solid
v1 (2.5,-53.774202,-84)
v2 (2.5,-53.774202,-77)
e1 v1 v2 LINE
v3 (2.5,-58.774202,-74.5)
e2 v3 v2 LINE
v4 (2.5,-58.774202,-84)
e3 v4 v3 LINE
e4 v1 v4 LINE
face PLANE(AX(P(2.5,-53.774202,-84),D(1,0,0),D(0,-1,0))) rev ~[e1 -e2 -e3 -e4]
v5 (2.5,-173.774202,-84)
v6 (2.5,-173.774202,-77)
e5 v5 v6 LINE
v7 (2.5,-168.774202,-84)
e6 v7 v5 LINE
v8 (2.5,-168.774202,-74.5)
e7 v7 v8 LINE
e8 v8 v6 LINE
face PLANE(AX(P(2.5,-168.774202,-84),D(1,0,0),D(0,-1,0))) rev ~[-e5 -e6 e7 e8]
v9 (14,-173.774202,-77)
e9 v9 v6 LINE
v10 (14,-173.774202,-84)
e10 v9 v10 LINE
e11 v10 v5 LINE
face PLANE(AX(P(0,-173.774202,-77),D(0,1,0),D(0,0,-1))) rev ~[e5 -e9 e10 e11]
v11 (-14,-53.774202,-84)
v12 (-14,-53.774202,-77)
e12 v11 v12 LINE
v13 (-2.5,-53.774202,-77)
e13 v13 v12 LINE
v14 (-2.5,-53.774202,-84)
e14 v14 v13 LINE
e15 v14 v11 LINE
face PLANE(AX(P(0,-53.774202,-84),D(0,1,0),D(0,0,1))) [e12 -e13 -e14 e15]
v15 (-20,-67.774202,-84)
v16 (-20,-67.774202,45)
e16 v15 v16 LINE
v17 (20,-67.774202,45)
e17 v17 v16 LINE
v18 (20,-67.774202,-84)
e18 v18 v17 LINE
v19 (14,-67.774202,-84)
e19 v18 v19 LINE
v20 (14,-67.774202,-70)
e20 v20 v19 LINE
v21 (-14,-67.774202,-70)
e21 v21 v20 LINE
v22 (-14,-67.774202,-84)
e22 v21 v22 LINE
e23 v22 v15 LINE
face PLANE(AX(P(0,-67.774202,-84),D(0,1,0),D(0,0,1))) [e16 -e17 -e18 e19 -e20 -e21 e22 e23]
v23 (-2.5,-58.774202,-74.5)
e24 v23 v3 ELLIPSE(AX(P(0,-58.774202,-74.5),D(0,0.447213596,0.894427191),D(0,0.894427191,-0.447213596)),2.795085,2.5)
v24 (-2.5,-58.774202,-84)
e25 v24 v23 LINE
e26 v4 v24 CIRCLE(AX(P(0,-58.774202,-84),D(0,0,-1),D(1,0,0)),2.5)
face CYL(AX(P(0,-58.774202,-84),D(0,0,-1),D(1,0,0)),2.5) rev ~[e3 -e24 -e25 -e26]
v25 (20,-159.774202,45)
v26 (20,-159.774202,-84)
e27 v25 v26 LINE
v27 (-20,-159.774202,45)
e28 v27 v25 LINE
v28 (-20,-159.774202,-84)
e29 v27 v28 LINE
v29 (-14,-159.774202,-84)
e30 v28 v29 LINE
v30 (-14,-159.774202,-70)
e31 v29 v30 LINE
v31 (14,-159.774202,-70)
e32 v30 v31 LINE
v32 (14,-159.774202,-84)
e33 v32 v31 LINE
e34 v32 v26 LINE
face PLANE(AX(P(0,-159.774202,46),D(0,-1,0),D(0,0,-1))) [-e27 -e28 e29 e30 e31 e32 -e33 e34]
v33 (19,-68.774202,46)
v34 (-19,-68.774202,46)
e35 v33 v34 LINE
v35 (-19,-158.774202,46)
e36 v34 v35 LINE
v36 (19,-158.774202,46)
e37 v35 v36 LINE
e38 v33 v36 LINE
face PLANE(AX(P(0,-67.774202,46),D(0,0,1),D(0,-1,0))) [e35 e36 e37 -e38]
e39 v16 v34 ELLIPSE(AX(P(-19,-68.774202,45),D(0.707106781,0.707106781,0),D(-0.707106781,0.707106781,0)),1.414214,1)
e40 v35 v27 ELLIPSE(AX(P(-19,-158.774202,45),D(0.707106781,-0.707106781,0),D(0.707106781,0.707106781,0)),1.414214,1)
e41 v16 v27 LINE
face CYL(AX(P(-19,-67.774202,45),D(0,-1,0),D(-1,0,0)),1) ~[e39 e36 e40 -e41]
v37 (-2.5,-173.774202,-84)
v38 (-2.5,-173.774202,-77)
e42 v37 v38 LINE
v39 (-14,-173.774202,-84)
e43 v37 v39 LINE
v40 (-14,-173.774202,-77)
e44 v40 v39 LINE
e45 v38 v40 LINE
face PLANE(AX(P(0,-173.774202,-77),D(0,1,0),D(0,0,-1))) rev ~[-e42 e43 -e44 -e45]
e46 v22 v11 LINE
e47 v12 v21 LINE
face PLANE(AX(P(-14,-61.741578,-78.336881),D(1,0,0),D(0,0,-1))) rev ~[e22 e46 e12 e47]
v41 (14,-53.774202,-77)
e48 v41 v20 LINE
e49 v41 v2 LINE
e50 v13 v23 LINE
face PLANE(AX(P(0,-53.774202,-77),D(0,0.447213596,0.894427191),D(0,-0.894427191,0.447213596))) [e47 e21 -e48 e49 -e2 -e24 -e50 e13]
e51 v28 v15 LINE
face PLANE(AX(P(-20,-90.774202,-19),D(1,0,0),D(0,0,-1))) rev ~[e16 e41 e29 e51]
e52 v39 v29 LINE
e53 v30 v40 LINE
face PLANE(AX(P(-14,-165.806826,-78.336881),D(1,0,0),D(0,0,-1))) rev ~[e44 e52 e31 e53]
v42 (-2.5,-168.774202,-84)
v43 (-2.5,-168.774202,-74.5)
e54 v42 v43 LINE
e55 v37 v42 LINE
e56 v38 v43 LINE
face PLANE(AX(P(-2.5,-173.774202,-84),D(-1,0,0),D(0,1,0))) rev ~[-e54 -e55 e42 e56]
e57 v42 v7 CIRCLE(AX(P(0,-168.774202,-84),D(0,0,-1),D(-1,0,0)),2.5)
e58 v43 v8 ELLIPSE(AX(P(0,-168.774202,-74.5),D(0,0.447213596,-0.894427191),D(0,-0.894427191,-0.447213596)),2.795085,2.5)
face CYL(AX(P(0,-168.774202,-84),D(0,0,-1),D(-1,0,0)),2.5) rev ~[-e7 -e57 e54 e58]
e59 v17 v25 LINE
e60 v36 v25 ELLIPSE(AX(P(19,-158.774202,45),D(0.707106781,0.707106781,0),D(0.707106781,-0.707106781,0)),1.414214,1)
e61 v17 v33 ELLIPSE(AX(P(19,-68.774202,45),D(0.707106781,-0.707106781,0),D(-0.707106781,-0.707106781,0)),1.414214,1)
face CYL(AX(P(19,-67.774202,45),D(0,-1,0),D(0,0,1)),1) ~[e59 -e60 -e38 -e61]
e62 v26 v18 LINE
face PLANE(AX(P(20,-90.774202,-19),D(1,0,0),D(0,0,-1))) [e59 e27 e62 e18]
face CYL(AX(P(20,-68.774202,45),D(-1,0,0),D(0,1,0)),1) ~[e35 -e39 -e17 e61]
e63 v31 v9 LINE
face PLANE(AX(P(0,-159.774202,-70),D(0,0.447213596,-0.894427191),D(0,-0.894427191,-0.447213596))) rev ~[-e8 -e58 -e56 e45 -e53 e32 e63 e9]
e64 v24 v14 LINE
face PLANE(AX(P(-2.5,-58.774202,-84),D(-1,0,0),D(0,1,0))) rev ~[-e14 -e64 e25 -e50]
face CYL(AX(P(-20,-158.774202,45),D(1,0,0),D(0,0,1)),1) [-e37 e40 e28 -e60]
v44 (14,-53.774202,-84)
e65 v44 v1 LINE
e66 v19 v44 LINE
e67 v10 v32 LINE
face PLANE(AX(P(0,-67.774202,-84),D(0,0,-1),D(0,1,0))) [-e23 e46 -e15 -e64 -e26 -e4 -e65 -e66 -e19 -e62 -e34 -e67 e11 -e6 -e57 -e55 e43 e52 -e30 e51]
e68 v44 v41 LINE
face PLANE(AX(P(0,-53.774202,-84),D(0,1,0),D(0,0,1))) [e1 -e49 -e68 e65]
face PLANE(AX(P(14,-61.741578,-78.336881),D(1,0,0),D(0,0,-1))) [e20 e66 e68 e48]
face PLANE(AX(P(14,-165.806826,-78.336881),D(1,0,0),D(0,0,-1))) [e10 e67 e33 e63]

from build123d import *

# Parameters (mm, degrees)
F1_DEPTH      = 20
F1_DEPTH_BACK = 20
F2_DEPTH      = 14
F2_DEPTH_BACK = 14
F4_DEPTH      = 25
F5_ANGLE      = 90
F6_R          = 1


with BuildPart() as f1:
    # F0 (on Right) → F1 (new body, two sides)
    with BuildSketch(Plane.YZ) as f1_sk:
        Polygon((48.225797835, 46), (-67.774202165, 46), (-67.774202165, 0), (62.225797835, 0), (62.225797835, 46), align=None)
        Polygon((62.225797835, 0), (-67.774202165, 0), (-67.774202165, -46), (48.225797835, -46), (62.225797835, -46), align=None)
    extrude(amount=F1_DEPTH)
    extrude(f1_sk.sketch, amount=-F1_DEPTH_BACK)

    # F0 (on Right) → F2 (join, two sides)
    with BuildSketch(Plane.YZ) as f2_sk:
        Polygon((55.225797835, 60), (48.225797835, 46), (62.225797835, 46), (62.225797835, 60), align=None)
        Polygon((62.225797835, -60), (62.225797835, -46), (48.225797835, -46), (55.225797835, -60), align=None)
    extrude(amount=F2_DEPTH)
    extrude(f2_sk.sketch, amount=-F2_DEPTH_BACK)

    # F3 (on face) → F4 (cut)
    with BuildSketch(Plane(origin=(0, 62.225797835, 0), x_dir=(-1, 0, 0), z_dir=(0, 1, 0))):
        with BuildLine():
            Line((2.5, 55), (2.5, 60))
            Line((2.5, 60), (-2.5, 60))
            Line((-2.5, 60), (-2.5, 55))
            ThreePointArc((-2.5, 55), (0, 52.5), (2.5, 55))
        make_face()
        with BuildLine():
            Line((2.5, -60), (2.5, -55))
            ThreePointArc((2.5, -55), (0, -52.5), (-2.5, -55))
            Line((-2.5, -55), (-2.5, -60))
            Line((-2.5, -60), (2.5, -60))
        make_face()
    extrude(amount=-F4_DEPTH, mode=Mode.SUBTRACT)


with BuildPart() as f1_1:
    # F5: moved
    add(f1.part.rotate(Axis((0, -67.774202165, 46), (-1, 0, 0)), F5_ANGLE))

    # F6
    f6_edges = [f1_1.edges().sort_by_distance(p)[0] for p in [
        (0, -159.774202, 46),
        (0, -67.774202, 46),
        (-20, -113.774202, 46),
        (20, -113.774202, 46),
    ]]
    fillet(f6_edges, radius=F6_R)


solid = f1_1.part
